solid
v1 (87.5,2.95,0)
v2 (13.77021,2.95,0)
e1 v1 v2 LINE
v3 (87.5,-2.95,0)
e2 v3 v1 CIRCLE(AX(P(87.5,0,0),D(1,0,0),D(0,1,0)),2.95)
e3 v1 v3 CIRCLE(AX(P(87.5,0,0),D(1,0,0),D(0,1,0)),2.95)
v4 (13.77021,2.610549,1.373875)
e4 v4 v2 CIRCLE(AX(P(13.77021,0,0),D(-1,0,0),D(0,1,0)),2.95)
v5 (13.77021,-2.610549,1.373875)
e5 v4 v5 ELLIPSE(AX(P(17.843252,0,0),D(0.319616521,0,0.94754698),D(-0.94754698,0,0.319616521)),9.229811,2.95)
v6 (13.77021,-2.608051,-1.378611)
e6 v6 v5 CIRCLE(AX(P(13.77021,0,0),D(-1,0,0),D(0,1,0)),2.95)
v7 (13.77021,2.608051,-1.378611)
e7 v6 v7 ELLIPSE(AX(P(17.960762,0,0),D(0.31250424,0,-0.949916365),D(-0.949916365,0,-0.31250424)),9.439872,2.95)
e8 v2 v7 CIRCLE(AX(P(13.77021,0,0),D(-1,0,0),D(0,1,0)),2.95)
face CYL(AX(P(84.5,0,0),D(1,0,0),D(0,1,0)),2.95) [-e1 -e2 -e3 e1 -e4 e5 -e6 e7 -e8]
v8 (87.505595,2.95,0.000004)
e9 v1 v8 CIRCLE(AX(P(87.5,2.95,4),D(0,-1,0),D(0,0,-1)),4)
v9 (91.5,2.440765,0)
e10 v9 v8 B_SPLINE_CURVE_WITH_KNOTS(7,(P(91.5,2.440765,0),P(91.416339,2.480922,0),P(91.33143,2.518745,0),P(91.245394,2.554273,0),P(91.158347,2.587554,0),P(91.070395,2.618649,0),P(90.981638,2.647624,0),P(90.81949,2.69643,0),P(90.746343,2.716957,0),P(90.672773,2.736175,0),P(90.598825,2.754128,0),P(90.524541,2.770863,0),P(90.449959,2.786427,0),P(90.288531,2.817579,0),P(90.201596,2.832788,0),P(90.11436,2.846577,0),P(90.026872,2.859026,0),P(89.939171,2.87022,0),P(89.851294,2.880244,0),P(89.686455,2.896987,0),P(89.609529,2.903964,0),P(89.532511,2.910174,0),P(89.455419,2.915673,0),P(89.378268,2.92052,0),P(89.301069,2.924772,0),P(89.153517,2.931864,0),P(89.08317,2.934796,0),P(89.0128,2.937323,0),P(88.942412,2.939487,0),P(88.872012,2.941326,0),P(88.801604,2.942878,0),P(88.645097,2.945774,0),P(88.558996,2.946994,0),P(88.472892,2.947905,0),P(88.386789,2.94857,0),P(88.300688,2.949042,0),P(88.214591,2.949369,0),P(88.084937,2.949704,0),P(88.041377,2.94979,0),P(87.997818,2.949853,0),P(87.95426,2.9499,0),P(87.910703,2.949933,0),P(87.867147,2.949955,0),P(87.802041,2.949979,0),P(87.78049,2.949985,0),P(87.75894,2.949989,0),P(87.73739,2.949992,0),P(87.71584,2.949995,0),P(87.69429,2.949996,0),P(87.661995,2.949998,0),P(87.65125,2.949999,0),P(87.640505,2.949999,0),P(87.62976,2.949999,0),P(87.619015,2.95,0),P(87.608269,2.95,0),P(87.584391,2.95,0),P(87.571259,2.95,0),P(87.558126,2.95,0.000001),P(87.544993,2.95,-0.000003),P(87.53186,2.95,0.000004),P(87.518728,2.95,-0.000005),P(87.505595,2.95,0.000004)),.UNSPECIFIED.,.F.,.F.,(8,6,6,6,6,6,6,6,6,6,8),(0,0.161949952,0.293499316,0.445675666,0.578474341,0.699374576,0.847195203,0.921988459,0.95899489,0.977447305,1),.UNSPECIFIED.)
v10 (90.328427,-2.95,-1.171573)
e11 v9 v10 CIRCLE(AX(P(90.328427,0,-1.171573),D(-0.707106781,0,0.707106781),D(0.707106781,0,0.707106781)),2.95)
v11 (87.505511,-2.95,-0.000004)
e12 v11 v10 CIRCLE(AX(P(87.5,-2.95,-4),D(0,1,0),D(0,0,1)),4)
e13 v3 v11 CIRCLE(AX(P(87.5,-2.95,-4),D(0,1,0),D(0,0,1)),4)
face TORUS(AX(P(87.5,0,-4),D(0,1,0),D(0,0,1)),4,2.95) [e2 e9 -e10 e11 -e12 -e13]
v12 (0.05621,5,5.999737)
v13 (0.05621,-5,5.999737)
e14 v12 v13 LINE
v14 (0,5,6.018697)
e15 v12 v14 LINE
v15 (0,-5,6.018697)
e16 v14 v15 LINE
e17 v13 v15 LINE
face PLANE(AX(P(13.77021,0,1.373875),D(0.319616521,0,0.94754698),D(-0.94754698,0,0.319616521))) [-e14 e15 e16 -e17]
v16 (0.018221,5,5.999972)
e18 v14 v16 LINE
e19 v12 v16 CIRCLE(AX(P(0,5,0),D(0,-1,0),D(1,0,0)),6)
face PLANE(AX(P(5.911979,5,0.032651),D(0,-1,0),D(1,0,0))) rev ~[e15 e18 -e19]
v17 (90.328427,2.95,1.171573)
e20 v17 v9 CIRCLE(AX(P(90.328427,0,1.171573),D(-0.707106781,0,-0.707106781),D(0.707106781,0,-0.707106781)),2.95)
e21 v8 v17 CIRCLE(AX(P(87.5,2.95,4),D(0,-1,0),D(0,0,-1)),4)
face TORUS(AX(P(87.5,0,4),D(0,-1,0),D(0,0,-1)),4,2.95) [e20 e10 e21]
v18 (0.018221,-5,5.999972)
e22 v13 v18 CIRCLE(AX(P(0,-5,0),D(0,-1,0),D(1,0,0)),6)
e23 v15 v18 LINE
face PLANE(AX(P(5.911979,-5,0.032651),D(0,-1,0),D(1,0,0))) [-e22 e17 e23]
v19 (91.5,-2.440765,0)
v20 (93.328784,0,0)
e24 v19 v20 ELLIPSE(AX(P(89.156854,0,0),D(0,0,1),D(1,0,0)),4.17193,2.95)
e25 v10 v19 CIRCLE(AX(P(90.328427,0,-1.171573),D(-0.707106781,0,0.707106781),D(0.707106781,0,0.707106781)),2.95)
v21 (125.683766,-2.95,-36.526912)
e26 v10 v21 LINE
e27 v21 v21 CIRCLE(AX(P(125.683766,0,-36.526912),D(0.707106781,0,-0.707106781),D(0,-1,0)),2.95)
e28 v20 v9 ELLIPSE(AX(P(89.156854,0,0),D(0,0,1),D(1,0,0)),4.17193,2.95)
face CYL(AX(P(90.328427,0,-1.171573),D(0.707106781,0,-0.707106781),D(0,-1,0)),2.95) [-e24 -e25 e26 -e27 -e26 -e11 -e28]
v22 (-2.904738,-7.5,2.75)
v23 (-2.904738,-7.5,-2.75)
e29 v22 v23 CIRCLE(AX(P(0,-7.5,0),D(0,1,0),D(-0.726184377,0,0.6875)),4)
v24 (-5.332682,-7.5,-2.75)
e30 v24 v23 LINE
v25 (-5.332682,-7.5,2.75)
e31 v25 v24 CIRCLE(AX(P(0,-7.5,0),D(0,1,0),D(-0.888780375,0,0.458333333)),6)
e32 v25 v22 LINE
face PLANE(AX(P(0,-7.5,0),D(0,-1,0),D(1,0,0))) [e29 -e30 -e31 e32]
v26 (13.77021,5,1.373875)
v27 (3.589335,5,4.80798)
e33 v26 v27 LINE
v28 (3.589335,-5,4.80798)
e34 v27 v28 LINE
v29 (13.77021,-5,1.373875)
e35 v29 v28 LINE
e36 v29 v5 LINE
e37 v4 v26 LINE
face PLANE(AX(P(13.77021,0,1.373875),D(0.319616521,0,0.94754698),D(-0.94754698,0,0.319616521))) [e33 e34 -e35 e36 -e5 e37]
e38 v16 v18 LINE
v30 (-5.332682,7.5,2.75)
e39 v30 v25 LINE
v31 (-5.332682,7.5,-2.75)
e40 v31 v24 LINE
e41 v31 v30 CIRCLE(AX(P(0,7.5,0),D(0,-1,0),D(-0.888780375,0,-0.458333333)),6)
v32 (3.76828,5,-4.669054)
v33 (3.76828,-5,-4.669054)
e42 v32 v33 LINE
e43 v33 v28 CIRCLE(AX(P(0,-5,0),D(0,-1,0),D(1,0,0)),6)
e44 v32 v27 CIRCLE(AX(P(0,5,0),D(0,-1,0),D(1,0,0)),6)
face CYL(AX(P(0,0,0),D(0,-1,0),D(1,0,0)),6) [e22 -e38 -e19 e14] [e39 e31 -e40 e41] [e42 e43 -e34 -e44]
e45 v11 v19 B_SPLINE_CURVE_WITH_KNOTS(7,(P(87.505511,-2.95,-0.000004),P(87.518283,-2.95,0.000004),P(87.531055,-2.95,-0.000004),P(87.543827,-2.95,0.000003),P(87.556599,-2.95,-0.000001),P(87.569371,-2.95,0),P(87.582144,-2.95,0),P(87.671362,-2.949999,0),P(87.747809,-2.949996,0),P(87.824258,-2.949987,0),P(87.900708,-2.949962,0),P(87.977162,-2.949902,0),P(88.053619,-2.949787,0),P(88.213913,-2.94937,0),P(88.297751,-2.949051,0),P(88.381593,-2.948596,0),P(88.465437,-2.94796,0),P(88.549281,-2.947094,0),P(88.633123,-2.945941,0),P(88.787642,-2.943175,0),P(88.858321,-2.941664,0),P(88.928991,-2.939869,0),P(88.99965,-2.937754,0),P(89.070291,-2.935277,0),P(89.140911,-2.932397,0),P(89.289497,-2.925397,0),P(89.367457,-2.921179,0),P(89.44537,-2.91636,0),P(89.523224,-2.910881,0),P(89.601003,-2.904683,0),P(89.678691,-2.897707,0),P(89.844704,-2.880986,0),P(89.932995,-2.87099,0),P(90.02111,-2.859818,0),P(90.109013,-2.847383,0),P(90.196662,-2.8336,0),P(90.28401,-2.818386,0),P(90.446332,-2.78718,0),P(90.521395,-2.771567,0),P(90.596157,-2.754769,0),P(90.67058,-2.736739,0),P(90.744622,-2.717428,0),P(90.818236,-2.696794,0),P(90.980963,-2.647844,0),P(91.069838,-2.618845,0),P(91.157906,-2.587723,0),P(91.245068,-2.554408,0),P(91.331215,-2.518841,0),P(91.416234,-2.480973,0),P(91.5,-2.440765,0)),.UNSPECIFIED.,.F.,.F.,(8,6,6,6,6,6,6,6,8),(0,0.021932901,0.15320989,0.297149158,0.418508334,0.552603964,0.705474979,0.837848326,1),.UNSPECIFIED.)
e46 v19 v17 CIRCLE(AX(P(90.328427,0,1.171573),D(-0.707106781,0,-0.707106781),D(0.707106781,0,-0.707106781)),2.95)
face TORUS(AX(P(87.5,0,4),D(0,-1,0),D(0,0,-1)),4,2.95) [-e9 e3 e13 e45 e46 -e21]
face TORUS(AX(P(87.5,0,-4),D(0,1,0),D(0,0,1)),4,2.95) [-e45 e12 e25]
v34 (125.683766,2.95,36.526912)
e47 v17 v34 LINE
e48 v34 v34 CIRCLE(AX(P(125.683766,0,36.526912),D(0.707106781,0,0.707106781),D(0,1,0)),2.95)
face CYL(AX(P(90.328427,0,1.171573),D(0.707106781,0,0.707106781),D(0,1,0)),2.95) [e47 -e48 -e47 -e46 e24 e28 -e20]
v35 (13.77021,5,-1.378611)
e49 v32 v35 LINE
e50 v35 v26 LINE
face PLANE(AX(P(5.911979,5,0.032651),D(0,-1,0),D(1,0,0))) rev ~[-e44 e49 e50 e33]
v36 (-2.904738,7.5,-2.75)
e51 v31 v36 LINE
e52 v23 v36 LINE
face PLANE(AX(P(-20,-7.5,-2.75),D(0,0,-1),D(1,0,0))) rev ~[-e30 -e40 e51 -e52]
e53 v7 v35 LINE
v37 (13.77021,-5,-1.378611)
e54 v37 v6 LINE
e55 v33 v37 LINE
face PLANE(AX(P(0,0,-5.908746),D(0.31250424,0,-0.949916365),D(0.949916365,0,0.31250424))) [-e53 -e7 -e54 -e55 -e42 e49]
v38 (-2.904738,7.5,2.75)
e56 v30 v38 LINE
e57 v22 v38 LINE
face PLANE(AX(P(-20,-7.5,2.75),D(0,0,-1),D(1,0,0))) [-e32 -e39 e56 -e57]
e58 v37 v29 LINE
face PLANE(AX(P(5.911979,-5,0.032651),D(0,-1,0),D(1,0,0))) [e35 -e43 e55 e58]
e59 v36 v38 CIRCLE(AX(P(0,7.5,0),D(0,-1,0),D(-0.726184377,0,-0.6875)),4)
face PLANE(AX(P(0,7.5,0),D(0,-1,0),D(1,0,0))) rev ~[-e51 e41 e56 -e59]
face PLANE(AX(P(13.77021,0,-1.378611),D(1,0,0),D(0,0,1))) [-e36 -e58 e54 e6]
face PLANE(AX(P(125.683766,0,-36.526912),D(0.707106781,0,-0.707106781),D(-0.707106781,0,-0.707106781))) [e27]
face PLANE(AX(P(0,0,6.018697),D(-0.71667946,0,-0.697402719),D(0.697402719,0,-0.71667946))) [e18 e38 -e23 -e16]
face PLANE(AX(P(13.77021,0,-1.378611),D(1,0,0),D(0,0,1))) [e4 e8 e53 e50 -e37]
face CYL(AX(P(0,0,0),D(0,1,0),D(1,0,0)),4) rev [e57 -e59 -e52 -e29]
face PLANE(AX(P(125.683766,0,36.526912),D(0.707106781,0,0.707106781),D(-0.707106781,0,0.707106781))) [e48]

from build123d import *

# Parameters (mm, degrees)
F0_R             = 6
F0_R_2           = 4
F1_DEPTH         = 7.5
F3_R             = 2.95
F4_DEPTH         = 80
F5_W             = 20
F5_H             = 5.5
F6_DEPTH         = 25
F12_DEPTH        = 5
F14_R            = 2.95
F16_COPIES_COUNT = 2


# Not quite as in the source:
# - a feature of the source that left no trace in its solid (it failed there, or was rolled back) is left out
# - a pattern or mirror of a feature is missing from the dataset's text; its kind, count and spacing are read off the source's solid


with BuildPart() as f1:
    # F0 (on Front) → F1 (new body, symmetric)
    with BuildSketch(Plane.XZ):
        Circle(F0_R)
        Circle(F0_R_2, mode=Mode.SUBTRACT)
    extrude(amount=F1_DEPTH, both=True)

    # F3 (on offset) → F4 (join)
    with BuildSketch(Plane.YZ.offset(4.5)):
        Circle(F3_R)
    extrude(amount=F4_DEPTH)

    # F5 (on face) → F6 (cut)
    with BuildSketch(Plane.XZ.offset(7.5)):
        with Locations((-10, 0)):
            Rectangle(F5_W, F5_H)
    extrude(amount=-F6_DEPTH, mode=Mode.SUBTRACT)

    # F11 (on face) → F12 (join, symmetric)
    with BuildSketch(Plane.XZ):
        Polygon((13.7702096254, 1.3738754205), (0, 6.0186968185), (5.8568101376, 0), (0, -5.9087458067), (13.7702096254, -1.3786113122), align=None)
    extrude(amount=F12_DEPTH, both=True)

    # F16: sweep along a path in F15
    with BuildLine(Plane.XZ) as f16_path:
        Line((84.5, 0), (87.5, 0))
        ThreePointArc((87.5, 0), (89.0307337295, 0.30448187), (90.3284271247, 1.1715728753))
        Line((90.3284271247, 1.1715728753), (125.6837661841, 36.5269119346))
    # F14 (on face) → F16 (sweep)
    with BuildSketch(Plane.YZ.offset(84.5)):
        Circle(F14_R)
    f16 = sweep(path=f16_path.line)

    # F16_copies: F16 ×2 about axis
    f16_copies_axis = Axis((0, 0, 0), (1, 0, 0))
    for i in range(1, F16_COPIES_COUNT):
        add(f16.rotate(f16_copies_axis, i * 360 / F16_COPIES_COUNT))


solid = f1.part
